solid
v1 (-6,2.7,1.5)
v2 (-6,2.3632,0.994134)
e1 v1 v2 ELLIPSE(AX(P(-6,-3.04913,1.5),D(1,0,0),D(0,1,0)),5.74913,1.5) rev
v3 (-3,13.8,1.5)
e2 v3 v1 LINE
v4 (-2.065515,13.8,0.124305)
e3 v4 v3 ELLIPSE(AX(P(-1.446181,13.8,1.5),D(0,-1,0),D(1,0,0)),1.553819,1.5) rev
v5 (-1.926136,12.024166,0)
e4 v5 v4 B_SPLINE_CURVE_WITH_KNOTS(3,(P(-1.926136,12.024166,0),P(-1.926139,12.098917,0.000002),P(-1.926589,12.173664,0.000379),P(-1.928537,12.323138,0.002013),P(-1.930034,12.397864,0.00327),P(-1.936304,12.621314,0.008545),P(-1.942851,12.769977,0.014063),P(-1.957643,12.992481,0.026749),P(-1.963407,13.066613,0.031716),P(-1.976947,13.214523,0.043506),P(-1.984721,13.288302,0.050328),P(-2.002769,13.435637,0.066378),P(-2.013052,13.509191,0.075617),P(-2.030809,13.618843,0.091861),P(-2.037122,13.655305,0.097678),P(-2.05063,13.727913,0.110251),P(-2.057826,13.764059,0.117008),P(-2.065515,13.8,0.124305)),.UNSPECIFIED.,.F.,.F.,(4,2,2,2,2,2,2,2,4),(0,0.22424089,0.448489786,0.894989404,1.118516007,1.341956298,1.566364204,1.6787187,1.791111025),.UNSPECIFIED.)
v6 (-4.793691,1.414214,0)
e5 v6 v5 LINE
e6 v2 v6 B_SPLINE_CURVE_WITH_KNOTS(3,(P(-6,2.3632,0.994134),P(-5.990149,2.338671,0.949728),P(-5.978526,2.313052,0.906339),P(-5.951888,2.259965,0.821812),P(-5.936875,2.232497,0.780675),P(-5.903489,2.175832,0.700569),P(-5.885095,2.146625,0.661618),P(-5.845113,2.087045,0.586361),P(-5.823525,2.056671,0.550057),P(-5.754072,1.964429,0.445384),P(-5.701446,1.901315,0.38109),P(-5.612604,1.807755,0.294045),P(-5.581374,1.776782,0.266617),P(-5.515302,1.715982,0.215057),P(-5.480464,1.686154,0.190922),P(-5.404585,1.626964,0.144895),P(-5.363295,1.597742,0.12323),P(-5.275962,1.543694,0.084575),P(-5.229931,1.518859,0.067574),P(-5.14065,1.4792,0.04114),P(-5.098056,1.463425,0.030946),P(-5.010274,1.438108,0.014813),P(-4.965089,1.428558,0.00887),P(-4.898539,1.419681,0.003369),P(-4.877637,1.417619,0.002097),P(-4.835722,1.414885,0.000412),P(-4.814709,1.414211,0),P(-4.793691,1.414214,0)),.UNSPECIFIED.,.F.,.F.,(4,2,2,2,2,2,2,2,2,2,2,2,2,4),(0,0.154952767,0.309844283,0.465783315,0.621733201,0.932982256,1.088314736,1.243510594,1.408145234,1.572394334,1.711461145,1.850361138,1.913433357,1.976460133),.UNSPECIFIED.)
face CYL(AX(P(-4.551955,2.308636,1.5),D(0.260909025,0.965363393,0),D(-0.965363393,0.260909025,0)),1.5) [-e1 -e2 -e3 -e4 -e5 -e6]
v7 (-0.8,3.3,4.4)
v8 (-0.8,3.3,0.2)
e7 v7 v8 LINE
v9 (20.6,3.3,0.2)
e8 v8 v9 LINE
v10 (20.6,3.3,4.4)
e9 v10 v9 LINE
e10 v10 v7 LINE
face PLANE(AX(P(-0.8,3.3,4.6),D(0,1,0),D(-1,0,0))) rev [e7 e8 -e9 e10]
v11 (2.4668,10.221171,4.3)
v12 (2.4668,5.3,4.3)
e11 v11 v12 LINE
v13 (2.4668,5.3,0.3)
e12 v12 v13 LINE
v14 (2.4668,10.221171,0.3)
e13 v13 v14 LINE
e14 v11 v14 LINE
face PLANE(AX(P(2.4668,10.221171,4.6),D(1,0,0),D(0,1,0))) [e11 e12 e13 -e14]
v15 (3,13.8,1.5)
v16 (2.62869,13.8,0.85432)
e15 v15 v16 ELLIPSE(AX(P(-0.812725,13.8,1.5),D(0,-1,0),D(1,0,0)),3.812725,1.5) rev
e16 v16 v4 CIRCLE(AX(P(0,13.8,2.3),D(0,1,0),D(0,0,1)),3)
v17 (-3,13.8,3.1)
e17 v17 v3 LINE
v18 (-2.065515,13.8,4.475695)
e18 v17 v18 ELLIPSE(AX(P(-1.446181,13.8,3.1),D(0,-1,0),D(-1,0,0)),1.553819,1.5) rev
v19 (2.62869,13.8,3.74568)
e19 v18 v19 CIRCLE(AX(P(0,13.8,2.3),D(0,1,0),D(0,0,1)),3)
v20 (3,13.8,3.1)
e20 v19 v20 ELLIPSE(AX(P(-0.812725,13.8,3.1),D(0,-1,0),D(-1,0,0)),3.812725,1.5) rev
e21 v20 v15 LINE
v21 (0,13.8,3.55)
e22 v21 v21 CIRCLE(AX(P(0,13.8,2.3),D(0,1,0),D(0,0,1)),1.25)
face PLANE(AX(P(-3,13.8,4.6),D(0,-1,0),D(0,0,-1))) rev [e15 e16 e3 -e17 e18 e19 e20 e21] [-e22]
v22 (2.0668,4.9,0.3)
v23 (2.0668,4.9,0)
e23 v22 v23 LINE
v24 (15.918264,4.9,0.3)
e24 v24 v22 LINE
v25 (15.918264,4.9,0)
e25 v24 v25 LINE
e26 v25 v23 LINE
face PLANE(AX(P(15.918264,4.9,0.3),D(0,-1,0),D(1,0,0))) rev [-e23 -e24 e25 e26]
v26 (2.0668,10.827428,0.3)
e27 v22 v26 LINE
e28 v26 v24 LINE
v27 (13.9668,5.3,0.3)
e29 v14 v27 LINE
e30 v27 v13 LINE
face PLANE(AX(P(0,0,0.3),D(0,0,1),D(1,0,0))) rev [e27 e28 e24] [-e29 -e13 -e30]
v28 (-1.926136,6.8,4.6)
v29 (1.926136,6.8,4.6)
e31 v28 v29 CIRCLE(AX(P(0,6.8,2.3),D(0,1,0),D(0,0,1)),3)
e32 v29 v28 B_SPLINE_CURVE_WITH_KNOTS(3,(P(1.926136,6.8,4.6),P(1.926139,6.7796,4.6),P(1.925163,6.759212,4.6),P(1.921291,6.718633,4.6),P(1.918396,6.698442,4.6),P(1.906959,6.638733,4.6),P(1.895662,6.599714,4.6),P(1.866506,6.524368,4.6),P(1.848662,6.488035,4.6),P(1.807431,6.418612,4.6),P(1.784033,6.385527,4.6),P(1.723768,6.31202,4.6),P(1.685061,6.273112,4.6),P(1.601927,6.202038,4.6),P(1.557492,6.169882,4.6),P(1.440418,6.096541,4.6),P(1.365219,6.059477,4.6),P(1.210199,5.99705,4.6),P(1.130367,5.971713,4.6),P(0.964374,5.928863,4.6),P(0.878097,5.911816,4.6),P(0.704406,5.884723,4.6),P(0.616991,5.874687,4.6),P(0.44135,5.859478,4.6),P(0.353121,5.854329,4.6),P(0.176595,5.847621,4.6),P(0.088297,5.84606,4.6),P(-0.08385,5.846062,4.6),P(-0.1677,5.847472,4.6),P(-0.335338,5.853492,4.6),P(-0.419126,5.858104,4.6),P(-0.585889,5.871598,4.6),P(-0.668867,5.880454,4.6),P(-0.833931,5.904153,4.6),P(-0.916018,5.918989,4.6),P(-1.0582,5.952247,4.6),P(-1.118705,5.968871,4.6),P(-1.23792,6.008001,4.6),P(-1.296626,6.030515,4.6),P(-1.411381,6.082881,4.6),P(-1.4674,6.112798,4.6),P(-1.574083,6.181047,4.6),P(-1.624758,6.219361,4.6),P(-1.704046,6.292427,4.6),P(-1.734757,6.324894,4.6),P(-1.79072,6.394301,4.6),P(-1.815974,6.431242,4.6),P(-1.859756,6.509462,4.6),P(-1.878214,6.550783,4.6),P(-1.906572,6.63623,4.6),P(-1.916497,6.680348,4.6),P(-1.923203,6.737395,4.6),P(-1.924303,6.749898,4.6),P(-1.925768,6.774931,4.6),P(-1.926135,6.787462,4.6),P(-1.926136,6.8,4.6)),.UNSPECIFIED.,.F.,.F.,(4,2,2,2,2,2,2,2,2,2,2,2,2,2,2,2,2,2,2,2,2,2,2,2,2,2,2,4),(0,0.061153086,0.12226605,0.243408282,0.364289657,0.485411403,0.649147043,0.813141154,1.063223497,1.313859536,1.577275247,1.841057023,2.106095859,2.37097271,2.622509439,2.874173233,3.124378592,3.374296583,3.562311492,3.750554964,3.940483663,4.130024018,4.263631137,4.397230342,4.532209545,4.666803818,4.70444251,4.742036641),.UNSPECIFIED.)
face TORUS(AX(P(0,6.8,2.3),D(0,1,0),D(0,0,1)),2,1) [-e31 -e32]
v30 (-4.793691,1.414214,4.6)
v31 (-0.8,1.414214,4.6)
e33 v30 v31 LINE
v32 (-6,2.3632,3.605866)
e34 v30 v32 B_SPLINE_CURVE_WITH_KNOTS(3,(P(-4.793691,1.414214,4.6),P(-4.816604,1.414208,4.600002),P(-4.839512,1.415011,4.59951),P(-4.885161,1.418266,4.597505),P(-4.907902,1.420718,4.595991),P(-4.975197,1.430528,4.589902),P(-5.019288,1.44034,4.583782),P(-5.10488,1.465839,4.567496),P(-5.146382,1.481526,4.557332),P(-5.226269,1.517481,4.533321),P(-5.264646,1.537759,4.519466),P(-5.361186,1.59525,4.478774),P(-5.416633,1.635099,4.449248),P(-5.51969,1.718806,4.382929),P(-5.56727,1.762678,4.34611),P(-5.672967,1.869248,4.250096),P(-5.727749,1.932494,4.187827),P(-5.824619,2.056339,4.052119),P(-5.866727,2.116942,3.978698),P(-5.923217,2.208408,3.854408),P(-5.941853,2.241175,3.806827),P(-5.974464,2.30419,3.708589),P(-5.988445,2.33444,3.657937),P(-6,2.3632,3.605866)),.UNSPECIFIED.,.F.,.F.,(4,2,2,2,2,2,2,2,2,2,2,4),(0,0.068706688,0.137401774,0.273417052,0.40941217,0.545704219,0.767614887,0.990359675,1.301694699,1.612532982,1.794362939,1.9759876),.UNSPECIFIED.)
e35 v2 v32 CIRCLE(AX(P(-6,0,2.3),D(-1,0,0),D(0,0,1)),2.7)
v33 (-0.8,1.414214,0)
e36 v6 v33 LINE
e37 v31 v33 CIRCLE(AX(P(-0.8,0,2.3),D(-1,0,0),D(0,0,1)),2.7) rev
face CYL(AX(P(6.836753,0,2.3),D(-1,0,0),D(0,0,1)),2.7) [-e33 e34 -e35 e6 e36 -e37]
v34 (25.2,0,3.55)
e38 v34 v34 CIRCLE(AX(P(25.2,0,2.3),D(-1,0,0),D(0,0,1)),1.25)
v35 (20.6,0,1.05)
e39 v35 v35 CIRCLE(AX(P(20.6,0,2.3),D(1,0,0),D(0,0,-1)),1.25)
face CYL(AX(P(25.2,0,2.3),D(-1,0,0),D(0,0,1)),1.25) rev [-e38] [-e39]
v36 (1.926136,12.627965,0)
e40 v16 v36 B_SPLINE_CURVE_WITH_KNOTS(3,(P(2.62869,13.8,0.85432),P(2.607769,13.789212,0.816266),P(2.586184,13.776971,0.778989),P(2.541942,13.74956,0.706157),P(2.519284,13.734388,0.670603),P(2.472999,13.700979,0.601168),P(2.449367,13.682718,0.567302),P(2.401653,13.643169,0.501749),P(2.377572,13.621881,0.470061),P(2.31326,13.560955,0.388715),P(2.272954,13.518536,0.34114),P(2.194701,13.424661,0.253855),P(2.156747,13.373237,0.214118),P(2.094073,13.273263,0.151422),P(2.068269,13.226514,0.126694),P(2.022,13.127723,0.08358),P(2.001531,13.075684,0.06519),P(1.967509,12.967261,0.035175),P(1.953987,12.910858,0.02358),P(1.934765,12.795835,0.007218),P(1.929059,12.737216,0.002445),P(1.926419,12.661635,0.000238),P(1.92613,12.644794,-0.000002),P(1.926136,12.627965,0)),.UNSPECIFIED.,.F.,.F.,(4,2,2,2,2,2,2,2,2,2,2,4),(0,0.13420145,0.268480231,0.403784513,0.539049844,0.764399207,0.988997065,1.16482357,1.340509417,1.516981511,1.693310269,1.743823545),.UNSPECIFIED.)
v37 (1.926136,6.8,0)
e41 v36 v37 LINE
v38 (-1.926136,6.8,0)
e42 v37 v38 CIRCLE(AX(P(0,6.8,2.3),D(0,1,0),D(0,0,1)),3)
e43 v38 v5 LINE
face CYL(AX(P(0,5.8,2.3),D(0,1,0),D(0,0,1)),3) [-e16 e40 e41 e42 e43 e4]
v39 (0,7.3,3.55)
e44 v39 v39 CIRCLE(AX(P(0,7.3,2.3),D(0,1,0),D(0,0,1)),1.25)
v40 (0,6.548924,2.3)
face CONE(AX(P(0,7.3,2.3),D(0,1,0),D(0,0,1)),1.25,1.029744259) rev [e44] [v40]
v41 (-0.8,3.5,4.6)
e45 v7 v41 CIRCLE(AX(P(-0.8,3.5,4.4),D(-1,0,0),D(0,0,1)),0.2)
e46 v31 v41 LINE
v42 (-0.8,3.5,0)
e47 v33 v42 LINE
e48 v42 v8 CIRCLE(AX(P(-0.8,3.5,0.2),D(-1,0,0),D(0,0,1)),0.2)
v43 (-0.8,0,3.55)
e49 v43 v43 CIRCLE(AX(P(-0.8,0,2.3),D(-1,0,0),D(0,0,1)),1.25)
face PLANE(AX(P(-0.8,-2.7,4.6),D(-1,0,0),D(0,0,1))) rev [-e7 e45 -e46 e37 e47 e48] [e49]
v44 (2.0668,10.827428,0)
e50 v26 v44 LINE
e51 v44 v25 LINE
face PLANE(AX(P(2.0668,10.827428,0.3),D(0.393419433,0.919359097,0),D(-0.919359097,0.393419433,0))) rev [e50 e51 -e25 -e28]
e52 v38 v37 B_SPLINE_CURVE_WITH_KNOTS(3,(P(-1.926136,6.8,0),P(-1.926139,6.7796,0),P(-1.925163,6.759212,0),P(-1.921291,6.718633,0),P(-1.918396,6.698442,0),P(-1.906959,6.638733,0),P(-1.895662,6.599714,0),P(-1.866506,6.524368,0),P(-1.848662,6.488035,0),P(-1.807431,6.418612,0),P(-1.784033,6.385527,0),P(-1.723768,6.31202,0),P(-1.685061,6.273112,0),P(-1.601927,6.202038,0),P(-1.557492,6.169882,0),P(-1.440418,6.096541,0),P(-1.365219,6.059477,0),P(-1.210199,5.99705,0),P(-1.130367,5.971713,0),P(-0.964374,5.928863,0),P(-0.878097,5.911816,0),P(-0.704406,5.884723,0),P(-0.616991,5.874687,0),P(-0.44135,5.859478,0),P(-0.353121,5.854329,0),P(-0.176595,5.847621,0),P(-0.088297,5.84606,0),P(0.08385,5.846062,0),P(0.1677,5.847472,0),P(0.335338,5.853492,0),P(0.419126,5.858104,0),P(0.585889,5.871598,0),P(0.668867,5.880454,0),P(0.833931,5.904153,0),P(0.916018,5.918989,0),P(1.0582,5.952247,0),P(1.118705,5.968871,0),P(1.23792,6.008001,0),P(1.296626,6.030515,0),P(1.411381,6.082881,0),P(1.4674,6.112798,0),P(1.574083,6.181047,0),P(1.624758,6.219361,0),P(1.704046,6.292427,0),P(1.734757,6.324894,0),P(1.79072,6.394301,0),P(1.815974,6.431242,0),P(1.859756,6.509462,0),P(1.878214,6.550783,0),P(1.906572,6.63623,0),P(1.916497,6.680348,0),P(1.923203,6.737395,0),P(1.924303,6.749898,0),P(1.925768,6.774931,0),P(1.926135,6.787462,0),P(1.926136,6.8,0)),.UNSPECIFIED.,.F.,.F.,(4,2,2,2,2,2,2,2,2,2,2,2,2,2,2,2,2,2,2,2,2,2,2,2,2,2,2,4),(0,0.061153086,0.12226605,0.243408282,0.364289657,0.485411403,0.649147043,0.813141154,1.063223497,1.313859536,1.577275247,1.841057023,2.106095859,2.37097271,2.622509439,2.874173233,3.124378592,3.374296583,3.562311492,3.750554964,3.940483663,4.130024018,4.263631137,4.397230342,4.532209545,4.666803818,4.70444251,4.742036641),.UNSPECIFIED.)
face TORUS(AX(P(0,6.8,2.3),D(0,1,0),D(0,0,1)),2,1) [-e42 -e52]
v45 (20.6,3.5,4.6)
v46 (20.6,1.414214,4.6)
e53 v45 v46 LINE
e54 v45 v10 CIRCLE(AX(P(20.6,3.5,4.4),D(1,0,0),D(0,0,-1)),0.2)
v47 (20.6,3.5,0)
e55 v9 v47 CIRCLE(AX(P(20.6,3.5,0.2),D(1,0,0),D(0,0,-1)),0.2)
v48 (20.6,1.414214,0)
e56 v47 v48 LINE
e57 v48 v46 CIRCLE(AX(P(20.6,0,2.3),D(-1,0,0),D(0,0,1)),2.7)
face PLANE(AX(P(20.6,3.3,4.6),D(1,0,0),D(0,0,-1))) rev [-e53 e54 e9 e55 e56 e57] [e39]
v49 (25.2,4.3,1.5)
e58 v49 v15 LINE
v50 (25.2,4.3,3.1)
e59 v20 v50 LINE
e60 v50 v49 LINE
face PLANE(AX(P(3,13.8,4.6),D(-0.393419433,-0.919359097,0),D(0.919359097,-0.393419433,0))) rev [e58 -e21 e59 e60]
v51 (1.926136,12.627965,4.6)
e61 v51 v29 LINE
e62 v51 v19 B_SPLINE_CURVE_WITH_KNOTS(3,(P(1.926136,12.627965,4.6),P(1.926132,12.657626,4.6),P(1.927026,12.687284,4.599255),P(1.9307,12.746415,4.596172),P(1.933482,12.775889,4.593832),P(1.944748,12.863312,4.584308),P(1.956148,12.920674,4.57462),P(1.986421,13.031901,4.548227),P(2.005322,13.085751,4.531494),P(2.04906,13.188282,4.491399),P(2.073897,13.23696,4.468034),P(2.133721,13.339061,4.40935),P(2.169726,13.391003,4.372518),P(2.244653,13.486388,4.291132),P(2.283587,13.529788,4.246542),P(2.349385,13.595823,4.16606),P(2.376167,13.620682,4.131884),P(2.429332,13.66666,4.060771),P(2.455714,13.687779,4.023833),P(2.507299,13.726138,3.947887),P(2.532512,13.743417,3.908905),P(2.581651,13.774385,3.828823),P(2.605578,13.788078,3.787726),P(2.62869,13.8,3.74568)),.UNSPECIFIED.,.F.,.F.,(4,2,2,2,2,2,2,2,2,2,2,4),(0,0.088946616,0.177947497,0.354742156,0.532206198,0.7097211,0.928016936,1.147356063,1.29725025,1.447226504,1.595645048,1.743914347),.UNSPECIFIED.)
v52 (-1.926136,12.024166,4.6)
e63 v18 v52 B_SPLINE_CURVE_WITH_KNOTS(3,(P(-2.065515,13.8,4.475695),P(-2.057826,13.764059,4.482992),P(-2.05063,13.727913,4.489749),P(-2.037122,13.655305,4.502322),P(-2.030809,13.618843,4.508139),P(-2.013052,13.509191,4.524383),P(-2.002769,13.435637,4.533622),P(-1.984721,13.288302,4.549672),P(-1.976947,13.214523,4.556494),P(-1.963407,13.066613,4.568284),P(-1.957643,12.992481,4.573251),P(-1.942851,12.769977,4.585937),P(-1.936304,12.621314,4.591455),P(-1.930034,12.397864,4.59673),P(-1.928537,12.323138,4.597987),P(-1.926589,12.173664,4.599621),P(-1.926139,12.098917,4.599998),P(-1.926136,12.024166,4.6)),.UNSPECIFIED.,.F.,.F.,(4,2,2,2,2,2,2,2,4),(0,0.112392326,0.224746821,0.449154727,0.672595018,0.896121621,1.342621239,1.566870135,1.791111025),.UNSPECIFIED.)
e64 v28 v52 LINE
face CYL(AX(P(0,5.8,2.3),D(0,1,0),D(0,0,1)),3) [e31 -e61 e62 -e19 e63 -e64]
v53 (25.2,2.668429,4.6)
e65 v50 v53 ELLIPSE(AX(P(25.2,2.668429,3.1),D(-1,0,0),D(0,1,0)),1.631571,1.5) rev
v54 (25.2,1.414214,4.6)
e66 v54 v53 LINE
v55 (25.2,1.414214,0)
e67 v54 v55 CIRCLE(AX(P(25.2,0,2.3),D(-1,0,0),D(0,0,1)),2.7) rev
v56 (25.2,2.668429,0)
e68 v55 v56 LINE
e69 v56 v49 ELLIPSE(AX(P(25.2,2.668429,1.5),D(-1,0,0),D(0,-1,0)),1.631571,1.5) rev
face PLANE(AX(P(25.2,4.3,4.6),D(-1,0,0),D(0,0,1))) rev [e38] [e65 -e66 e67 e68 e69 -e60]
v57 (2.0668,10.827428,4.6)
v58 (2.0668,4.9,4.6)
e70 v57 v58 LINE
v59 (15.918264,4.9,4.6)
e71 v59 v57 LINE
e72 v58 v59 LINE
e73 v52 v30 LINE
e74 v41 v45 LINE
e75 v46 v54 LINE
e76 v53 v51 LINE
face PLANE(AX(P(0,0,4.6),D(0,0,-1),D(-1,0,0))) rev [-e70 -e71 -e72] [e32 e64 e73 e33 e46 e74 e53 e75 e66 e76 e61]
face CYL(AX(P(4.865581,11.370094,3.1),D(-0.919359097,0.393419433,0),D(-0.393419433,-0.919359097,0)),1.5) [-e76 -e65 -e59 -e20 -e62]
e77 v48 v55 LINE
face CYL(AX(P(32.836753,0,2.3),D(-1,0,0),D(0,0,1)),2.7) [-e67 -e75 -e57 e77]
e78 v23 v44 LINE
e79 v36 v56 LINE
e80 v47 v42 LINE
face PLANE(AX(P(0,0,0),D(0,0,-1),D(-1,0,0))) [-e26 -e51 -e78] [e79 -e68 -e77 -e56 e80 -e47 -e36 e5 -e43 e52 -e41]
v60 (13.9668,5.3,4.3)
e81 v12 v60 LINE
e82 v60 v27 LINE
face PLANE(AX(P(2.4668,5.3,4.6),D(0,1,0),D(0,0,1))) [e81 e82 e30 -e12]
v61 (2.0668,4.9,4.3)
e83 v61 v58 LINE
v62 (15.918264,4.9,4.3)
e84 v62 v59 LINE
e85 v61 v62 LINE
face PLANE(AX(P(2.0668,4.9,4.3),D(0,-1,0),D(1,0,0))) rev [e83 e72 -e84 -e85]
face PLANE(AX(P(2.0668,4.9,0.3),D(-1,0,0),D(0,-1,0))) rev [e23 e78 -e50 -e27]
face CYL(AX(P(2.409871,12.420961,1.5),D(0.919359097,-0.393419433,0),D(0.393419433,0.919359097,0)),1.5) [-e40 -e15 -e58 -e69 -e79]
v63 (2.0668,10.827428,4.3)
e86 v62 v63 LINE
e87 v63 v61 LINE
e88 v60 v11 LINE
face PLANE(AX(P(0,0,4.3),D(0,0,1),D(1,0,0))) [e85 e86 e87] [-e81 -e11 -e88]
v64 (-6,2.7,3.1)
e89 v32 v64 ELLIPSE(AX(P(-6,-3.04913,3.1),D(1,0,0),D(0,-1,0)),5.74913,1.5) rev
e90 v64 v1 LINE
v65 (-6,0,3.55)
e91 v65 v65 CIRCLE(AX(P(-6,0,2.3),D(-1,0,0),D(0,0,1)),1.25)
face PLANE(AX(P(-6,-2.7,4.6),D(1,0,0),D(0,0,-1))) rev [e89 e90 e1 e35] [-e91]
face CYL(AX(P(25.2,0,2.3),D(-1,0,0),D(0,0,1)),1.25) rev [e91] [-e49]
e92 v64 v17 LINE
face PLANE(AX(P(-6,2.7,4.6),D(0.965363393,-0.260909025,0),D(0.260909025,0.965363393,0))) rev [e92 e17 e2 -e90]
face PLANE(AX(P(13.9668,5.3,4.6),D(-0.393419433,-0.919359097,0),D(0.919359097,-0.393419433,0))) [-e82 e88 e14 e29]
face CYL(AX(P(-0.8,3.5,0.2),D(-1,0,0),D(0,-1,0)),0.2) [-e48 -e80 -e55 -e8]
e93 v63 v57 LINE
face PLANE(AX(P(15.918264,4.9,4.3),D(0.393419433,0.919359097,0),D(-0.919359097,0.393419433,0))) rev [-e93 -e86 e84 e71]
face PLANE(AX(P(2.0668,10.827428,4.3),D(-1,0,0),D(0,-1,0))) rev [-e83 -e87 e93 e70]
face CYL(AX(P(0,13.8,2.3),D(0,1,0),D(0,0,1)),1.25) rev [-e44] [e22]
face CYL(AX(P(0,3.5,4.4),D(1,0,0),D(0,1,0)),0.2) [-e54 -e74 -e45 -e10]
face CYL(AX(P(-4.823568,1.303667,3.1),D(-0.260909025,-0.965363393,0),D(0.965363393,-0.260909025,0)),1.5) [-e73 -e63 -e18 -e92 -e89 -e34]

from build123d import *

# Parameters (mm, degrees)
EXTRUDE_1_DEPTH        = 4.6
SKETCH_2_R             = 3
EXTRUDE_2_DEPTH        = 8
SKETCH_3_R             = 2.7
EXTRUDE_3_DEPTH        = 5.2
SKETCH_5_R             = 2.7
EXTRUDE_4_DEPTH        = 4.6
CUT_EXTRUDE_1_DEPTH    = 35.524918537
FILLET_1_R             = 1.5
CUT_EXTRUDE_2_DEPTH    = 30.215920451
CUT_EXTRUDE_3_DEPTH    = 0.3
CUT_EXTRUDE_4_DEPTH    = 0.3
FILLET_2_R             = 0.2
FILLET_3_R             = 1
SKETCH_9_R             = 1.25
CUT_EXTRUDE_5_DEPTH    = 35.524918683
HOLE_WIZARD_M3_1_D     = 2.5
HOLE_WIZARD_M3_1_DEPTH = 6.5
HOLE_WIZARD_M3_1_TIP   = 0.751075774


with BuildPart() as part:
    # 草图1 → 凸台-拉伸1 (new body)
    with BuildSketch(Plane.XY):
        Polygon((-0.8, -2.7), (-0.8, 3.3), (20.6, 3.3), (20.6, -2.7), (25.2, -2.7), (25.2, 4.3), (3, 13.8), (-3, 13.8), (-6, 2.7), (-6, -2.7), align=None)
        Polygon((2.46680021, 10.221171171), (2.46680021, 5.3), (13.96680021, 5.3), align=None, mode=Mode.SUBTRACT)
    extrude(amount=EXTRUDE_1_DEPTH)

    # 草图2 → 凸台-拉伸2 (add)
    with BuildSketch(Plane(origin=(0, 13.8, 0), x_dir=(1, 0, 0), z_dir=(0, 1, 0))):
        with Locations((0, -2.3)):
            Circle(SKETCH_2_R)
    extrude(amount=-EXTRUDE_2_DEPTH)

    # 草图3 → 凸台-拉伸3 (add)
    with BuildSketch(Plane.ZY.offset(6)):
        with Locations((2.3, 0)):
            Circle(SKETCH_3_R)
    extrude(amount=-EXTRUDE_3_DEPTH)

    # 草图5 → 凸台-拉伸4 (add)
    with BuildSketch(Plane.ZY.offset(-20.6)):
        with Locations((2.3, 0)):
            Circle(SKETCH_5_R)
    extrude(amount=-EXTRUDE_4_DEPTH)

    # 草图4 → 切除-拉伸1 (cut, through all)
    with BuildSketch(Plane.ZY.offset(6)):
        with BuildLine():
            ThreePointArc((4.6, -1.414213562), (3.617502065, -2.356732549), (2.3, -2.7))
            Line((2.3, -2.7), (4.6, -2.7))
            Line((4.6, -2.7), (4.6, -1.414213562))
        make_face()
        with BuildLine():
            ThreePointArc((2.3, -2.7), (0.982497935, -2.356732549), (0, -1.414213562))
            Line((0, -1.414213562), (0, -2.7))
            Line((0, -2.7), (2.3, -2.7))
        make_face()
    extrude(amount=-CUT_EXTRUDE_1_DEPTH, mode=Mode.SUBTRACT)

    # 圆角1
    # the kernel refuses this fillet: 1.5 mm, written as the material it takes off along each edge
    with BuildSketch(Plane(origin=(-2.021591156, 17.420112724, 0), x_dir=(0.9653633930282662, -0.26090902514277475, 0), z_dir=(-0.2609090251427748, -0.9653633930282663, 0))) as fillet_1_piece_1_section:
        with BuildLine():
            CenterArc((FILLET_1_R, FILLET_1_R), FILLET_1_R, 180, 90)
            Line((0, FILLET_1_R), (0, 0))
            Line((0, 0), (FILLET_1_R, 0))
        make_face()
    fillet_1_piece_1 = extrude(amount=18.998260738, mode=Mode.PRIVATE)
    fillet_1_piece_1 = fillet_1_piece_1 - Plane(origin=(-4.247071053, 0, 2.3), x_dir=(0, 0, 1), z_dir=(-1, 0, 0)) * Cylinder(2.7, 44, mode=Mode.PRIVATE)
    fillet_1_piece_1 = fillet_1_piece_1 - Plane(origin=(0, 7.876054914, 2.3), x_dir=(1, 0, 0), z_dir=(0, 1, 0)) * Cylinder(3, 44, mode=Mode.PRIVATE)
    add(fillet_1_piece_1, mode=Mode.SUBTRACT)
    with BuildSketch(Plane(origin=(-2.021591156, 17.420112724, 4.6), x_dir=(0.9653633930282662, -0.26090902514277475, 0), z_dir=(-0.2609090251427748, -0.9653633930282663, 0))) as fillet_1_piece_2_section:
        with BuildLine():
            CenterArc((FILLET_1_R, -FILLET_1_R), FILLET_1_R, 90, 90)
            Line((0, -FILLET_1_R), (0, 0))
            Line((0, 0), (FILLET_1_R, 0))
        make_face()
    fillet_1_piece_2 = extrude(amount=18.998260738, mode=Mode.PRIVATE)
    fillet_1_piece_2 = fillet_1_piece_2 - Plane(origin=(-4.247069139, 0, 2.3), x_dir=(0, 0, 1), z_dir=(-1, 0, 0)) * Cylinder(2.7, 44, mode=Mode.PRIVATE)
    fillet_1_piece_2 = fillet_1_piece_2 - Plane(origin=(0, 7.876066276, 2.3), x_dir=(1, 0, 0), z_dir=(0, 1, 0)) * Cylinder(3, 44, mode=Mode.PRIVATE)
    add(fillet_1_piece_2, mode=Mode.SUBTRACT)
    with BuildSketch(Plane(origin=(28.647596614, 2.824677125, 0), x_dir=(-0.39341943343746105, -0.9193590970854355, 0), z_dir=(-0.9193590970854355, 0.39341943343746105, 0))) as fillet_1_piece_3_section:
        with BuildLine():
            CenterArc((FILLET_1_R, FILLET_1_R), FILLET_1_R, 180, 90)
            Line((0, FILLET_1_R), (0, 0))
            Line((0, 0), (FILLET_1_R, 0))
        make_face()
    fillet_1_piece_3 = extrude(amount=31.647256573, mode=Mode.PRIVATE)
    fillet_1_piece_3 = fillet_1_piece_3 - Plane(origin=(0, 8.805883363, 2.3), x_dir=(1, 0, 0), z_dir=(0, 1, 0)) * Cylinder(3, 70, mode=Mode.PRIVATE)
    add(fillet_1_piece_3, mode=Mode.SUBTRACT)
    with BuildSketch(Plane(origin=(28.647596614, 2.824677125, 4.6), x_dir=(-0.39341943343746105, -0.9193590970854355, 0), z_dir=(-0.9193590970854355, 0.39341943343746105, 0))) as fillet_1_piece_4_section:
        with BuildLine():
            CenterArc((FILLET_1_R, -FILLET_1_R), FILLET_1_R, 90, 90)
            Line((0, -FILLET_1_R), (0, 0))
            Line((0, 0), (FILLET_1_R, 0))
        make_face()
    fillet_1_piece_4 = extrude(amount=31.647256573, mode=Mode.PRIVATE)
    fillet_1_piece_4 = fillet_1_piece_4 - Plane(origin=(0, 8.805887847, 2.3), x_dir=(1, 0, 0), z_dir=(0, 1, 0)) * Cylinder(3, 70, mode=Mode.PRIVATE)
    add(fillet_1_piece_4, mode=Mode.SUBTRACT)

    # 草图6 → 切除-拉伸2 (cut, through all)
    with BuildSketch(Plane.XY.offset(4.6)):
        Polygon((13.96680021, 5.3), (2.46680021, 10.221171171), (2.46680021, 5.3), align=None)
    extrude(amount=-CUT_EXTRUDE_2_DEPTH, mode=Mode.SUBTRACT)

    # 草图7 → 切除-拉伸3 (cut)
    with BuildSketch(Plane.XY.offset(4.6)):
        Polygon((2.06680021, 10.827428046), (2.06680021, 4.9), (15.918263645, 4.9), align=None)
        Polygon((2.46680021, 10.221171171), (2.46680021, 5.3), (13.96680021, 5.3), align=None, mode=Mode.SUBTRACT)
    extrude(amount=-CUT_EXTRUDE_3_DEPTH, mode=Mode.SUBTRACT)

    # 草图8 → 切除-拉伸4 (cut)
    with BuildSketch(Plane(origin=(0, 0, 0), x_dir=(-1, 0, 0), z_dir=(0, 0, -1))):
        Polygon((-2.06680021, 4.9), (-2.06680021, 10.827428046), (-15.918263645, 4.9), align=None)
        Polygon((-2.46680021, 5.3), (-2.46680021, 10.221171171), (-13.96680021, 5.3), align=None, mode=Mode.SUBTRACT)
    extrude(amount=-CUT_EXTRUDE_4_DEPTH, mode=Mode.SUBTRACT)

    # 圆角2
    fillet_2_edges = [part.edges().sort_by_distance(p)[0] for p in [
        (9.9, 3.3, 4.6),
        (9.9, 3.3, 0),
    ]]
    fillet(fillet_2_edges, radius=FILLET_2_R)

    # 圆角3
    # the kernel refuses this fillet: 1 mm, written as the material it takes off along each edge
    with BuildSketch(Plane(origin=(0, 5.8, 2.3), x_dir=(-0.9991986620043835, 0, 0.040025415034074786), z_dir=(-0.040025415034074786, 0, -0.9991986620043835))) as fillet_3_piece_1_section:
        with BuildLine():
            CenterArc((3 - FILLET_3_R, FILLET_3_R), FILLET_3_R, 270, 90)
            Line((3 - FILLET_3_R, 0), (3, 0))
            Line((3, 0), (3, FILLET_3_R))
        make_face()
    fillet_3_piece_1 = revolve(axis=Axis((0, 5.8, 2.3), (0, 1, 0)), revolution_arc=175.412199766, mode=Mode.PRIVATE)
    fillet_3_piece_1 = split(fillet_3_piece_1, bisect_by=Plane(origin=(0, 6.202737669, 4.6), z_dir=(0, 0, 1)), keep=Keep.TOP, mode=Mode.PRIVATE)
    add(fillet_3_piece_1, mode=Mode.SUBTRACT)
    with BuildSketch(Plane(origin=(0, 5.8, 2.3), x_dir=(0.9991986620043835, 0, -0.04002541503407598), z_dir=(0.04002541503407598, 0, 0.9991986620043835))) as fillet_3_piece_2_section:
        with BuildLine():
            CenterArc((3 - FILLET_3_R, FILLET_3_R), FILLET_3_R, 270, 90)
            Line((3 - FILLET_3_R, 0), (3, 0))
            Line((3, 0), (3, FILLET_3_R))
        make_face()
    fillet_3_piece_2 = revolve(axis=Axis((0, 5.8, 2.3), (0, 1, 0)), revolution_arc=175.412199766, mode=Mode.PRIVATE)
    fillet_3_piece_2 = split(fillet_3_piece_2, bisect_by=Plane(origin=(0, 6.202737669, 0), z_dir=(0, 0, -1)), keep=Keep.TOP, mode=Mode.PRIVATE)
    add(fillet_3_piece_2, mode=Mode.SUBTRACT)

    # 草图9 → 切除-拉伸5 (cut, through all)
    with BuildSketch(Plane.ZY.offset(6)):
        with Locations((2.3, 0)):
            Circle(SKETCH_9_R)
    extrude(amount=-CUT_EXTRUDE_5_DEPTH, mode=Mode.SUBTRACT)

    # M3 螺纹孔1
    with Locations(Plane(origin=(0, 13.8, 2.3), x_dir=(0, 0, 1), z_dir=(0, 1, 0))):
        with Locations((0, 0)):
            Hole(HOLE_WIZARD_M3_1_D / 2, depth=HOLE_WIZARD_M3_1_DEPTH)
            with Locations((0, 0, -(HOLE_WIZARD_M3_1_DEPTH + HOLE_WIZARD_M3_1_TIP / 2))):  # 118° drill point
                Cone(0, HOLE_WIZARD_M3_1_D / 2, HOLE_WIZARD_M3_1_TIP, mode=Mode.SUBTRACT)


solid = part.part
